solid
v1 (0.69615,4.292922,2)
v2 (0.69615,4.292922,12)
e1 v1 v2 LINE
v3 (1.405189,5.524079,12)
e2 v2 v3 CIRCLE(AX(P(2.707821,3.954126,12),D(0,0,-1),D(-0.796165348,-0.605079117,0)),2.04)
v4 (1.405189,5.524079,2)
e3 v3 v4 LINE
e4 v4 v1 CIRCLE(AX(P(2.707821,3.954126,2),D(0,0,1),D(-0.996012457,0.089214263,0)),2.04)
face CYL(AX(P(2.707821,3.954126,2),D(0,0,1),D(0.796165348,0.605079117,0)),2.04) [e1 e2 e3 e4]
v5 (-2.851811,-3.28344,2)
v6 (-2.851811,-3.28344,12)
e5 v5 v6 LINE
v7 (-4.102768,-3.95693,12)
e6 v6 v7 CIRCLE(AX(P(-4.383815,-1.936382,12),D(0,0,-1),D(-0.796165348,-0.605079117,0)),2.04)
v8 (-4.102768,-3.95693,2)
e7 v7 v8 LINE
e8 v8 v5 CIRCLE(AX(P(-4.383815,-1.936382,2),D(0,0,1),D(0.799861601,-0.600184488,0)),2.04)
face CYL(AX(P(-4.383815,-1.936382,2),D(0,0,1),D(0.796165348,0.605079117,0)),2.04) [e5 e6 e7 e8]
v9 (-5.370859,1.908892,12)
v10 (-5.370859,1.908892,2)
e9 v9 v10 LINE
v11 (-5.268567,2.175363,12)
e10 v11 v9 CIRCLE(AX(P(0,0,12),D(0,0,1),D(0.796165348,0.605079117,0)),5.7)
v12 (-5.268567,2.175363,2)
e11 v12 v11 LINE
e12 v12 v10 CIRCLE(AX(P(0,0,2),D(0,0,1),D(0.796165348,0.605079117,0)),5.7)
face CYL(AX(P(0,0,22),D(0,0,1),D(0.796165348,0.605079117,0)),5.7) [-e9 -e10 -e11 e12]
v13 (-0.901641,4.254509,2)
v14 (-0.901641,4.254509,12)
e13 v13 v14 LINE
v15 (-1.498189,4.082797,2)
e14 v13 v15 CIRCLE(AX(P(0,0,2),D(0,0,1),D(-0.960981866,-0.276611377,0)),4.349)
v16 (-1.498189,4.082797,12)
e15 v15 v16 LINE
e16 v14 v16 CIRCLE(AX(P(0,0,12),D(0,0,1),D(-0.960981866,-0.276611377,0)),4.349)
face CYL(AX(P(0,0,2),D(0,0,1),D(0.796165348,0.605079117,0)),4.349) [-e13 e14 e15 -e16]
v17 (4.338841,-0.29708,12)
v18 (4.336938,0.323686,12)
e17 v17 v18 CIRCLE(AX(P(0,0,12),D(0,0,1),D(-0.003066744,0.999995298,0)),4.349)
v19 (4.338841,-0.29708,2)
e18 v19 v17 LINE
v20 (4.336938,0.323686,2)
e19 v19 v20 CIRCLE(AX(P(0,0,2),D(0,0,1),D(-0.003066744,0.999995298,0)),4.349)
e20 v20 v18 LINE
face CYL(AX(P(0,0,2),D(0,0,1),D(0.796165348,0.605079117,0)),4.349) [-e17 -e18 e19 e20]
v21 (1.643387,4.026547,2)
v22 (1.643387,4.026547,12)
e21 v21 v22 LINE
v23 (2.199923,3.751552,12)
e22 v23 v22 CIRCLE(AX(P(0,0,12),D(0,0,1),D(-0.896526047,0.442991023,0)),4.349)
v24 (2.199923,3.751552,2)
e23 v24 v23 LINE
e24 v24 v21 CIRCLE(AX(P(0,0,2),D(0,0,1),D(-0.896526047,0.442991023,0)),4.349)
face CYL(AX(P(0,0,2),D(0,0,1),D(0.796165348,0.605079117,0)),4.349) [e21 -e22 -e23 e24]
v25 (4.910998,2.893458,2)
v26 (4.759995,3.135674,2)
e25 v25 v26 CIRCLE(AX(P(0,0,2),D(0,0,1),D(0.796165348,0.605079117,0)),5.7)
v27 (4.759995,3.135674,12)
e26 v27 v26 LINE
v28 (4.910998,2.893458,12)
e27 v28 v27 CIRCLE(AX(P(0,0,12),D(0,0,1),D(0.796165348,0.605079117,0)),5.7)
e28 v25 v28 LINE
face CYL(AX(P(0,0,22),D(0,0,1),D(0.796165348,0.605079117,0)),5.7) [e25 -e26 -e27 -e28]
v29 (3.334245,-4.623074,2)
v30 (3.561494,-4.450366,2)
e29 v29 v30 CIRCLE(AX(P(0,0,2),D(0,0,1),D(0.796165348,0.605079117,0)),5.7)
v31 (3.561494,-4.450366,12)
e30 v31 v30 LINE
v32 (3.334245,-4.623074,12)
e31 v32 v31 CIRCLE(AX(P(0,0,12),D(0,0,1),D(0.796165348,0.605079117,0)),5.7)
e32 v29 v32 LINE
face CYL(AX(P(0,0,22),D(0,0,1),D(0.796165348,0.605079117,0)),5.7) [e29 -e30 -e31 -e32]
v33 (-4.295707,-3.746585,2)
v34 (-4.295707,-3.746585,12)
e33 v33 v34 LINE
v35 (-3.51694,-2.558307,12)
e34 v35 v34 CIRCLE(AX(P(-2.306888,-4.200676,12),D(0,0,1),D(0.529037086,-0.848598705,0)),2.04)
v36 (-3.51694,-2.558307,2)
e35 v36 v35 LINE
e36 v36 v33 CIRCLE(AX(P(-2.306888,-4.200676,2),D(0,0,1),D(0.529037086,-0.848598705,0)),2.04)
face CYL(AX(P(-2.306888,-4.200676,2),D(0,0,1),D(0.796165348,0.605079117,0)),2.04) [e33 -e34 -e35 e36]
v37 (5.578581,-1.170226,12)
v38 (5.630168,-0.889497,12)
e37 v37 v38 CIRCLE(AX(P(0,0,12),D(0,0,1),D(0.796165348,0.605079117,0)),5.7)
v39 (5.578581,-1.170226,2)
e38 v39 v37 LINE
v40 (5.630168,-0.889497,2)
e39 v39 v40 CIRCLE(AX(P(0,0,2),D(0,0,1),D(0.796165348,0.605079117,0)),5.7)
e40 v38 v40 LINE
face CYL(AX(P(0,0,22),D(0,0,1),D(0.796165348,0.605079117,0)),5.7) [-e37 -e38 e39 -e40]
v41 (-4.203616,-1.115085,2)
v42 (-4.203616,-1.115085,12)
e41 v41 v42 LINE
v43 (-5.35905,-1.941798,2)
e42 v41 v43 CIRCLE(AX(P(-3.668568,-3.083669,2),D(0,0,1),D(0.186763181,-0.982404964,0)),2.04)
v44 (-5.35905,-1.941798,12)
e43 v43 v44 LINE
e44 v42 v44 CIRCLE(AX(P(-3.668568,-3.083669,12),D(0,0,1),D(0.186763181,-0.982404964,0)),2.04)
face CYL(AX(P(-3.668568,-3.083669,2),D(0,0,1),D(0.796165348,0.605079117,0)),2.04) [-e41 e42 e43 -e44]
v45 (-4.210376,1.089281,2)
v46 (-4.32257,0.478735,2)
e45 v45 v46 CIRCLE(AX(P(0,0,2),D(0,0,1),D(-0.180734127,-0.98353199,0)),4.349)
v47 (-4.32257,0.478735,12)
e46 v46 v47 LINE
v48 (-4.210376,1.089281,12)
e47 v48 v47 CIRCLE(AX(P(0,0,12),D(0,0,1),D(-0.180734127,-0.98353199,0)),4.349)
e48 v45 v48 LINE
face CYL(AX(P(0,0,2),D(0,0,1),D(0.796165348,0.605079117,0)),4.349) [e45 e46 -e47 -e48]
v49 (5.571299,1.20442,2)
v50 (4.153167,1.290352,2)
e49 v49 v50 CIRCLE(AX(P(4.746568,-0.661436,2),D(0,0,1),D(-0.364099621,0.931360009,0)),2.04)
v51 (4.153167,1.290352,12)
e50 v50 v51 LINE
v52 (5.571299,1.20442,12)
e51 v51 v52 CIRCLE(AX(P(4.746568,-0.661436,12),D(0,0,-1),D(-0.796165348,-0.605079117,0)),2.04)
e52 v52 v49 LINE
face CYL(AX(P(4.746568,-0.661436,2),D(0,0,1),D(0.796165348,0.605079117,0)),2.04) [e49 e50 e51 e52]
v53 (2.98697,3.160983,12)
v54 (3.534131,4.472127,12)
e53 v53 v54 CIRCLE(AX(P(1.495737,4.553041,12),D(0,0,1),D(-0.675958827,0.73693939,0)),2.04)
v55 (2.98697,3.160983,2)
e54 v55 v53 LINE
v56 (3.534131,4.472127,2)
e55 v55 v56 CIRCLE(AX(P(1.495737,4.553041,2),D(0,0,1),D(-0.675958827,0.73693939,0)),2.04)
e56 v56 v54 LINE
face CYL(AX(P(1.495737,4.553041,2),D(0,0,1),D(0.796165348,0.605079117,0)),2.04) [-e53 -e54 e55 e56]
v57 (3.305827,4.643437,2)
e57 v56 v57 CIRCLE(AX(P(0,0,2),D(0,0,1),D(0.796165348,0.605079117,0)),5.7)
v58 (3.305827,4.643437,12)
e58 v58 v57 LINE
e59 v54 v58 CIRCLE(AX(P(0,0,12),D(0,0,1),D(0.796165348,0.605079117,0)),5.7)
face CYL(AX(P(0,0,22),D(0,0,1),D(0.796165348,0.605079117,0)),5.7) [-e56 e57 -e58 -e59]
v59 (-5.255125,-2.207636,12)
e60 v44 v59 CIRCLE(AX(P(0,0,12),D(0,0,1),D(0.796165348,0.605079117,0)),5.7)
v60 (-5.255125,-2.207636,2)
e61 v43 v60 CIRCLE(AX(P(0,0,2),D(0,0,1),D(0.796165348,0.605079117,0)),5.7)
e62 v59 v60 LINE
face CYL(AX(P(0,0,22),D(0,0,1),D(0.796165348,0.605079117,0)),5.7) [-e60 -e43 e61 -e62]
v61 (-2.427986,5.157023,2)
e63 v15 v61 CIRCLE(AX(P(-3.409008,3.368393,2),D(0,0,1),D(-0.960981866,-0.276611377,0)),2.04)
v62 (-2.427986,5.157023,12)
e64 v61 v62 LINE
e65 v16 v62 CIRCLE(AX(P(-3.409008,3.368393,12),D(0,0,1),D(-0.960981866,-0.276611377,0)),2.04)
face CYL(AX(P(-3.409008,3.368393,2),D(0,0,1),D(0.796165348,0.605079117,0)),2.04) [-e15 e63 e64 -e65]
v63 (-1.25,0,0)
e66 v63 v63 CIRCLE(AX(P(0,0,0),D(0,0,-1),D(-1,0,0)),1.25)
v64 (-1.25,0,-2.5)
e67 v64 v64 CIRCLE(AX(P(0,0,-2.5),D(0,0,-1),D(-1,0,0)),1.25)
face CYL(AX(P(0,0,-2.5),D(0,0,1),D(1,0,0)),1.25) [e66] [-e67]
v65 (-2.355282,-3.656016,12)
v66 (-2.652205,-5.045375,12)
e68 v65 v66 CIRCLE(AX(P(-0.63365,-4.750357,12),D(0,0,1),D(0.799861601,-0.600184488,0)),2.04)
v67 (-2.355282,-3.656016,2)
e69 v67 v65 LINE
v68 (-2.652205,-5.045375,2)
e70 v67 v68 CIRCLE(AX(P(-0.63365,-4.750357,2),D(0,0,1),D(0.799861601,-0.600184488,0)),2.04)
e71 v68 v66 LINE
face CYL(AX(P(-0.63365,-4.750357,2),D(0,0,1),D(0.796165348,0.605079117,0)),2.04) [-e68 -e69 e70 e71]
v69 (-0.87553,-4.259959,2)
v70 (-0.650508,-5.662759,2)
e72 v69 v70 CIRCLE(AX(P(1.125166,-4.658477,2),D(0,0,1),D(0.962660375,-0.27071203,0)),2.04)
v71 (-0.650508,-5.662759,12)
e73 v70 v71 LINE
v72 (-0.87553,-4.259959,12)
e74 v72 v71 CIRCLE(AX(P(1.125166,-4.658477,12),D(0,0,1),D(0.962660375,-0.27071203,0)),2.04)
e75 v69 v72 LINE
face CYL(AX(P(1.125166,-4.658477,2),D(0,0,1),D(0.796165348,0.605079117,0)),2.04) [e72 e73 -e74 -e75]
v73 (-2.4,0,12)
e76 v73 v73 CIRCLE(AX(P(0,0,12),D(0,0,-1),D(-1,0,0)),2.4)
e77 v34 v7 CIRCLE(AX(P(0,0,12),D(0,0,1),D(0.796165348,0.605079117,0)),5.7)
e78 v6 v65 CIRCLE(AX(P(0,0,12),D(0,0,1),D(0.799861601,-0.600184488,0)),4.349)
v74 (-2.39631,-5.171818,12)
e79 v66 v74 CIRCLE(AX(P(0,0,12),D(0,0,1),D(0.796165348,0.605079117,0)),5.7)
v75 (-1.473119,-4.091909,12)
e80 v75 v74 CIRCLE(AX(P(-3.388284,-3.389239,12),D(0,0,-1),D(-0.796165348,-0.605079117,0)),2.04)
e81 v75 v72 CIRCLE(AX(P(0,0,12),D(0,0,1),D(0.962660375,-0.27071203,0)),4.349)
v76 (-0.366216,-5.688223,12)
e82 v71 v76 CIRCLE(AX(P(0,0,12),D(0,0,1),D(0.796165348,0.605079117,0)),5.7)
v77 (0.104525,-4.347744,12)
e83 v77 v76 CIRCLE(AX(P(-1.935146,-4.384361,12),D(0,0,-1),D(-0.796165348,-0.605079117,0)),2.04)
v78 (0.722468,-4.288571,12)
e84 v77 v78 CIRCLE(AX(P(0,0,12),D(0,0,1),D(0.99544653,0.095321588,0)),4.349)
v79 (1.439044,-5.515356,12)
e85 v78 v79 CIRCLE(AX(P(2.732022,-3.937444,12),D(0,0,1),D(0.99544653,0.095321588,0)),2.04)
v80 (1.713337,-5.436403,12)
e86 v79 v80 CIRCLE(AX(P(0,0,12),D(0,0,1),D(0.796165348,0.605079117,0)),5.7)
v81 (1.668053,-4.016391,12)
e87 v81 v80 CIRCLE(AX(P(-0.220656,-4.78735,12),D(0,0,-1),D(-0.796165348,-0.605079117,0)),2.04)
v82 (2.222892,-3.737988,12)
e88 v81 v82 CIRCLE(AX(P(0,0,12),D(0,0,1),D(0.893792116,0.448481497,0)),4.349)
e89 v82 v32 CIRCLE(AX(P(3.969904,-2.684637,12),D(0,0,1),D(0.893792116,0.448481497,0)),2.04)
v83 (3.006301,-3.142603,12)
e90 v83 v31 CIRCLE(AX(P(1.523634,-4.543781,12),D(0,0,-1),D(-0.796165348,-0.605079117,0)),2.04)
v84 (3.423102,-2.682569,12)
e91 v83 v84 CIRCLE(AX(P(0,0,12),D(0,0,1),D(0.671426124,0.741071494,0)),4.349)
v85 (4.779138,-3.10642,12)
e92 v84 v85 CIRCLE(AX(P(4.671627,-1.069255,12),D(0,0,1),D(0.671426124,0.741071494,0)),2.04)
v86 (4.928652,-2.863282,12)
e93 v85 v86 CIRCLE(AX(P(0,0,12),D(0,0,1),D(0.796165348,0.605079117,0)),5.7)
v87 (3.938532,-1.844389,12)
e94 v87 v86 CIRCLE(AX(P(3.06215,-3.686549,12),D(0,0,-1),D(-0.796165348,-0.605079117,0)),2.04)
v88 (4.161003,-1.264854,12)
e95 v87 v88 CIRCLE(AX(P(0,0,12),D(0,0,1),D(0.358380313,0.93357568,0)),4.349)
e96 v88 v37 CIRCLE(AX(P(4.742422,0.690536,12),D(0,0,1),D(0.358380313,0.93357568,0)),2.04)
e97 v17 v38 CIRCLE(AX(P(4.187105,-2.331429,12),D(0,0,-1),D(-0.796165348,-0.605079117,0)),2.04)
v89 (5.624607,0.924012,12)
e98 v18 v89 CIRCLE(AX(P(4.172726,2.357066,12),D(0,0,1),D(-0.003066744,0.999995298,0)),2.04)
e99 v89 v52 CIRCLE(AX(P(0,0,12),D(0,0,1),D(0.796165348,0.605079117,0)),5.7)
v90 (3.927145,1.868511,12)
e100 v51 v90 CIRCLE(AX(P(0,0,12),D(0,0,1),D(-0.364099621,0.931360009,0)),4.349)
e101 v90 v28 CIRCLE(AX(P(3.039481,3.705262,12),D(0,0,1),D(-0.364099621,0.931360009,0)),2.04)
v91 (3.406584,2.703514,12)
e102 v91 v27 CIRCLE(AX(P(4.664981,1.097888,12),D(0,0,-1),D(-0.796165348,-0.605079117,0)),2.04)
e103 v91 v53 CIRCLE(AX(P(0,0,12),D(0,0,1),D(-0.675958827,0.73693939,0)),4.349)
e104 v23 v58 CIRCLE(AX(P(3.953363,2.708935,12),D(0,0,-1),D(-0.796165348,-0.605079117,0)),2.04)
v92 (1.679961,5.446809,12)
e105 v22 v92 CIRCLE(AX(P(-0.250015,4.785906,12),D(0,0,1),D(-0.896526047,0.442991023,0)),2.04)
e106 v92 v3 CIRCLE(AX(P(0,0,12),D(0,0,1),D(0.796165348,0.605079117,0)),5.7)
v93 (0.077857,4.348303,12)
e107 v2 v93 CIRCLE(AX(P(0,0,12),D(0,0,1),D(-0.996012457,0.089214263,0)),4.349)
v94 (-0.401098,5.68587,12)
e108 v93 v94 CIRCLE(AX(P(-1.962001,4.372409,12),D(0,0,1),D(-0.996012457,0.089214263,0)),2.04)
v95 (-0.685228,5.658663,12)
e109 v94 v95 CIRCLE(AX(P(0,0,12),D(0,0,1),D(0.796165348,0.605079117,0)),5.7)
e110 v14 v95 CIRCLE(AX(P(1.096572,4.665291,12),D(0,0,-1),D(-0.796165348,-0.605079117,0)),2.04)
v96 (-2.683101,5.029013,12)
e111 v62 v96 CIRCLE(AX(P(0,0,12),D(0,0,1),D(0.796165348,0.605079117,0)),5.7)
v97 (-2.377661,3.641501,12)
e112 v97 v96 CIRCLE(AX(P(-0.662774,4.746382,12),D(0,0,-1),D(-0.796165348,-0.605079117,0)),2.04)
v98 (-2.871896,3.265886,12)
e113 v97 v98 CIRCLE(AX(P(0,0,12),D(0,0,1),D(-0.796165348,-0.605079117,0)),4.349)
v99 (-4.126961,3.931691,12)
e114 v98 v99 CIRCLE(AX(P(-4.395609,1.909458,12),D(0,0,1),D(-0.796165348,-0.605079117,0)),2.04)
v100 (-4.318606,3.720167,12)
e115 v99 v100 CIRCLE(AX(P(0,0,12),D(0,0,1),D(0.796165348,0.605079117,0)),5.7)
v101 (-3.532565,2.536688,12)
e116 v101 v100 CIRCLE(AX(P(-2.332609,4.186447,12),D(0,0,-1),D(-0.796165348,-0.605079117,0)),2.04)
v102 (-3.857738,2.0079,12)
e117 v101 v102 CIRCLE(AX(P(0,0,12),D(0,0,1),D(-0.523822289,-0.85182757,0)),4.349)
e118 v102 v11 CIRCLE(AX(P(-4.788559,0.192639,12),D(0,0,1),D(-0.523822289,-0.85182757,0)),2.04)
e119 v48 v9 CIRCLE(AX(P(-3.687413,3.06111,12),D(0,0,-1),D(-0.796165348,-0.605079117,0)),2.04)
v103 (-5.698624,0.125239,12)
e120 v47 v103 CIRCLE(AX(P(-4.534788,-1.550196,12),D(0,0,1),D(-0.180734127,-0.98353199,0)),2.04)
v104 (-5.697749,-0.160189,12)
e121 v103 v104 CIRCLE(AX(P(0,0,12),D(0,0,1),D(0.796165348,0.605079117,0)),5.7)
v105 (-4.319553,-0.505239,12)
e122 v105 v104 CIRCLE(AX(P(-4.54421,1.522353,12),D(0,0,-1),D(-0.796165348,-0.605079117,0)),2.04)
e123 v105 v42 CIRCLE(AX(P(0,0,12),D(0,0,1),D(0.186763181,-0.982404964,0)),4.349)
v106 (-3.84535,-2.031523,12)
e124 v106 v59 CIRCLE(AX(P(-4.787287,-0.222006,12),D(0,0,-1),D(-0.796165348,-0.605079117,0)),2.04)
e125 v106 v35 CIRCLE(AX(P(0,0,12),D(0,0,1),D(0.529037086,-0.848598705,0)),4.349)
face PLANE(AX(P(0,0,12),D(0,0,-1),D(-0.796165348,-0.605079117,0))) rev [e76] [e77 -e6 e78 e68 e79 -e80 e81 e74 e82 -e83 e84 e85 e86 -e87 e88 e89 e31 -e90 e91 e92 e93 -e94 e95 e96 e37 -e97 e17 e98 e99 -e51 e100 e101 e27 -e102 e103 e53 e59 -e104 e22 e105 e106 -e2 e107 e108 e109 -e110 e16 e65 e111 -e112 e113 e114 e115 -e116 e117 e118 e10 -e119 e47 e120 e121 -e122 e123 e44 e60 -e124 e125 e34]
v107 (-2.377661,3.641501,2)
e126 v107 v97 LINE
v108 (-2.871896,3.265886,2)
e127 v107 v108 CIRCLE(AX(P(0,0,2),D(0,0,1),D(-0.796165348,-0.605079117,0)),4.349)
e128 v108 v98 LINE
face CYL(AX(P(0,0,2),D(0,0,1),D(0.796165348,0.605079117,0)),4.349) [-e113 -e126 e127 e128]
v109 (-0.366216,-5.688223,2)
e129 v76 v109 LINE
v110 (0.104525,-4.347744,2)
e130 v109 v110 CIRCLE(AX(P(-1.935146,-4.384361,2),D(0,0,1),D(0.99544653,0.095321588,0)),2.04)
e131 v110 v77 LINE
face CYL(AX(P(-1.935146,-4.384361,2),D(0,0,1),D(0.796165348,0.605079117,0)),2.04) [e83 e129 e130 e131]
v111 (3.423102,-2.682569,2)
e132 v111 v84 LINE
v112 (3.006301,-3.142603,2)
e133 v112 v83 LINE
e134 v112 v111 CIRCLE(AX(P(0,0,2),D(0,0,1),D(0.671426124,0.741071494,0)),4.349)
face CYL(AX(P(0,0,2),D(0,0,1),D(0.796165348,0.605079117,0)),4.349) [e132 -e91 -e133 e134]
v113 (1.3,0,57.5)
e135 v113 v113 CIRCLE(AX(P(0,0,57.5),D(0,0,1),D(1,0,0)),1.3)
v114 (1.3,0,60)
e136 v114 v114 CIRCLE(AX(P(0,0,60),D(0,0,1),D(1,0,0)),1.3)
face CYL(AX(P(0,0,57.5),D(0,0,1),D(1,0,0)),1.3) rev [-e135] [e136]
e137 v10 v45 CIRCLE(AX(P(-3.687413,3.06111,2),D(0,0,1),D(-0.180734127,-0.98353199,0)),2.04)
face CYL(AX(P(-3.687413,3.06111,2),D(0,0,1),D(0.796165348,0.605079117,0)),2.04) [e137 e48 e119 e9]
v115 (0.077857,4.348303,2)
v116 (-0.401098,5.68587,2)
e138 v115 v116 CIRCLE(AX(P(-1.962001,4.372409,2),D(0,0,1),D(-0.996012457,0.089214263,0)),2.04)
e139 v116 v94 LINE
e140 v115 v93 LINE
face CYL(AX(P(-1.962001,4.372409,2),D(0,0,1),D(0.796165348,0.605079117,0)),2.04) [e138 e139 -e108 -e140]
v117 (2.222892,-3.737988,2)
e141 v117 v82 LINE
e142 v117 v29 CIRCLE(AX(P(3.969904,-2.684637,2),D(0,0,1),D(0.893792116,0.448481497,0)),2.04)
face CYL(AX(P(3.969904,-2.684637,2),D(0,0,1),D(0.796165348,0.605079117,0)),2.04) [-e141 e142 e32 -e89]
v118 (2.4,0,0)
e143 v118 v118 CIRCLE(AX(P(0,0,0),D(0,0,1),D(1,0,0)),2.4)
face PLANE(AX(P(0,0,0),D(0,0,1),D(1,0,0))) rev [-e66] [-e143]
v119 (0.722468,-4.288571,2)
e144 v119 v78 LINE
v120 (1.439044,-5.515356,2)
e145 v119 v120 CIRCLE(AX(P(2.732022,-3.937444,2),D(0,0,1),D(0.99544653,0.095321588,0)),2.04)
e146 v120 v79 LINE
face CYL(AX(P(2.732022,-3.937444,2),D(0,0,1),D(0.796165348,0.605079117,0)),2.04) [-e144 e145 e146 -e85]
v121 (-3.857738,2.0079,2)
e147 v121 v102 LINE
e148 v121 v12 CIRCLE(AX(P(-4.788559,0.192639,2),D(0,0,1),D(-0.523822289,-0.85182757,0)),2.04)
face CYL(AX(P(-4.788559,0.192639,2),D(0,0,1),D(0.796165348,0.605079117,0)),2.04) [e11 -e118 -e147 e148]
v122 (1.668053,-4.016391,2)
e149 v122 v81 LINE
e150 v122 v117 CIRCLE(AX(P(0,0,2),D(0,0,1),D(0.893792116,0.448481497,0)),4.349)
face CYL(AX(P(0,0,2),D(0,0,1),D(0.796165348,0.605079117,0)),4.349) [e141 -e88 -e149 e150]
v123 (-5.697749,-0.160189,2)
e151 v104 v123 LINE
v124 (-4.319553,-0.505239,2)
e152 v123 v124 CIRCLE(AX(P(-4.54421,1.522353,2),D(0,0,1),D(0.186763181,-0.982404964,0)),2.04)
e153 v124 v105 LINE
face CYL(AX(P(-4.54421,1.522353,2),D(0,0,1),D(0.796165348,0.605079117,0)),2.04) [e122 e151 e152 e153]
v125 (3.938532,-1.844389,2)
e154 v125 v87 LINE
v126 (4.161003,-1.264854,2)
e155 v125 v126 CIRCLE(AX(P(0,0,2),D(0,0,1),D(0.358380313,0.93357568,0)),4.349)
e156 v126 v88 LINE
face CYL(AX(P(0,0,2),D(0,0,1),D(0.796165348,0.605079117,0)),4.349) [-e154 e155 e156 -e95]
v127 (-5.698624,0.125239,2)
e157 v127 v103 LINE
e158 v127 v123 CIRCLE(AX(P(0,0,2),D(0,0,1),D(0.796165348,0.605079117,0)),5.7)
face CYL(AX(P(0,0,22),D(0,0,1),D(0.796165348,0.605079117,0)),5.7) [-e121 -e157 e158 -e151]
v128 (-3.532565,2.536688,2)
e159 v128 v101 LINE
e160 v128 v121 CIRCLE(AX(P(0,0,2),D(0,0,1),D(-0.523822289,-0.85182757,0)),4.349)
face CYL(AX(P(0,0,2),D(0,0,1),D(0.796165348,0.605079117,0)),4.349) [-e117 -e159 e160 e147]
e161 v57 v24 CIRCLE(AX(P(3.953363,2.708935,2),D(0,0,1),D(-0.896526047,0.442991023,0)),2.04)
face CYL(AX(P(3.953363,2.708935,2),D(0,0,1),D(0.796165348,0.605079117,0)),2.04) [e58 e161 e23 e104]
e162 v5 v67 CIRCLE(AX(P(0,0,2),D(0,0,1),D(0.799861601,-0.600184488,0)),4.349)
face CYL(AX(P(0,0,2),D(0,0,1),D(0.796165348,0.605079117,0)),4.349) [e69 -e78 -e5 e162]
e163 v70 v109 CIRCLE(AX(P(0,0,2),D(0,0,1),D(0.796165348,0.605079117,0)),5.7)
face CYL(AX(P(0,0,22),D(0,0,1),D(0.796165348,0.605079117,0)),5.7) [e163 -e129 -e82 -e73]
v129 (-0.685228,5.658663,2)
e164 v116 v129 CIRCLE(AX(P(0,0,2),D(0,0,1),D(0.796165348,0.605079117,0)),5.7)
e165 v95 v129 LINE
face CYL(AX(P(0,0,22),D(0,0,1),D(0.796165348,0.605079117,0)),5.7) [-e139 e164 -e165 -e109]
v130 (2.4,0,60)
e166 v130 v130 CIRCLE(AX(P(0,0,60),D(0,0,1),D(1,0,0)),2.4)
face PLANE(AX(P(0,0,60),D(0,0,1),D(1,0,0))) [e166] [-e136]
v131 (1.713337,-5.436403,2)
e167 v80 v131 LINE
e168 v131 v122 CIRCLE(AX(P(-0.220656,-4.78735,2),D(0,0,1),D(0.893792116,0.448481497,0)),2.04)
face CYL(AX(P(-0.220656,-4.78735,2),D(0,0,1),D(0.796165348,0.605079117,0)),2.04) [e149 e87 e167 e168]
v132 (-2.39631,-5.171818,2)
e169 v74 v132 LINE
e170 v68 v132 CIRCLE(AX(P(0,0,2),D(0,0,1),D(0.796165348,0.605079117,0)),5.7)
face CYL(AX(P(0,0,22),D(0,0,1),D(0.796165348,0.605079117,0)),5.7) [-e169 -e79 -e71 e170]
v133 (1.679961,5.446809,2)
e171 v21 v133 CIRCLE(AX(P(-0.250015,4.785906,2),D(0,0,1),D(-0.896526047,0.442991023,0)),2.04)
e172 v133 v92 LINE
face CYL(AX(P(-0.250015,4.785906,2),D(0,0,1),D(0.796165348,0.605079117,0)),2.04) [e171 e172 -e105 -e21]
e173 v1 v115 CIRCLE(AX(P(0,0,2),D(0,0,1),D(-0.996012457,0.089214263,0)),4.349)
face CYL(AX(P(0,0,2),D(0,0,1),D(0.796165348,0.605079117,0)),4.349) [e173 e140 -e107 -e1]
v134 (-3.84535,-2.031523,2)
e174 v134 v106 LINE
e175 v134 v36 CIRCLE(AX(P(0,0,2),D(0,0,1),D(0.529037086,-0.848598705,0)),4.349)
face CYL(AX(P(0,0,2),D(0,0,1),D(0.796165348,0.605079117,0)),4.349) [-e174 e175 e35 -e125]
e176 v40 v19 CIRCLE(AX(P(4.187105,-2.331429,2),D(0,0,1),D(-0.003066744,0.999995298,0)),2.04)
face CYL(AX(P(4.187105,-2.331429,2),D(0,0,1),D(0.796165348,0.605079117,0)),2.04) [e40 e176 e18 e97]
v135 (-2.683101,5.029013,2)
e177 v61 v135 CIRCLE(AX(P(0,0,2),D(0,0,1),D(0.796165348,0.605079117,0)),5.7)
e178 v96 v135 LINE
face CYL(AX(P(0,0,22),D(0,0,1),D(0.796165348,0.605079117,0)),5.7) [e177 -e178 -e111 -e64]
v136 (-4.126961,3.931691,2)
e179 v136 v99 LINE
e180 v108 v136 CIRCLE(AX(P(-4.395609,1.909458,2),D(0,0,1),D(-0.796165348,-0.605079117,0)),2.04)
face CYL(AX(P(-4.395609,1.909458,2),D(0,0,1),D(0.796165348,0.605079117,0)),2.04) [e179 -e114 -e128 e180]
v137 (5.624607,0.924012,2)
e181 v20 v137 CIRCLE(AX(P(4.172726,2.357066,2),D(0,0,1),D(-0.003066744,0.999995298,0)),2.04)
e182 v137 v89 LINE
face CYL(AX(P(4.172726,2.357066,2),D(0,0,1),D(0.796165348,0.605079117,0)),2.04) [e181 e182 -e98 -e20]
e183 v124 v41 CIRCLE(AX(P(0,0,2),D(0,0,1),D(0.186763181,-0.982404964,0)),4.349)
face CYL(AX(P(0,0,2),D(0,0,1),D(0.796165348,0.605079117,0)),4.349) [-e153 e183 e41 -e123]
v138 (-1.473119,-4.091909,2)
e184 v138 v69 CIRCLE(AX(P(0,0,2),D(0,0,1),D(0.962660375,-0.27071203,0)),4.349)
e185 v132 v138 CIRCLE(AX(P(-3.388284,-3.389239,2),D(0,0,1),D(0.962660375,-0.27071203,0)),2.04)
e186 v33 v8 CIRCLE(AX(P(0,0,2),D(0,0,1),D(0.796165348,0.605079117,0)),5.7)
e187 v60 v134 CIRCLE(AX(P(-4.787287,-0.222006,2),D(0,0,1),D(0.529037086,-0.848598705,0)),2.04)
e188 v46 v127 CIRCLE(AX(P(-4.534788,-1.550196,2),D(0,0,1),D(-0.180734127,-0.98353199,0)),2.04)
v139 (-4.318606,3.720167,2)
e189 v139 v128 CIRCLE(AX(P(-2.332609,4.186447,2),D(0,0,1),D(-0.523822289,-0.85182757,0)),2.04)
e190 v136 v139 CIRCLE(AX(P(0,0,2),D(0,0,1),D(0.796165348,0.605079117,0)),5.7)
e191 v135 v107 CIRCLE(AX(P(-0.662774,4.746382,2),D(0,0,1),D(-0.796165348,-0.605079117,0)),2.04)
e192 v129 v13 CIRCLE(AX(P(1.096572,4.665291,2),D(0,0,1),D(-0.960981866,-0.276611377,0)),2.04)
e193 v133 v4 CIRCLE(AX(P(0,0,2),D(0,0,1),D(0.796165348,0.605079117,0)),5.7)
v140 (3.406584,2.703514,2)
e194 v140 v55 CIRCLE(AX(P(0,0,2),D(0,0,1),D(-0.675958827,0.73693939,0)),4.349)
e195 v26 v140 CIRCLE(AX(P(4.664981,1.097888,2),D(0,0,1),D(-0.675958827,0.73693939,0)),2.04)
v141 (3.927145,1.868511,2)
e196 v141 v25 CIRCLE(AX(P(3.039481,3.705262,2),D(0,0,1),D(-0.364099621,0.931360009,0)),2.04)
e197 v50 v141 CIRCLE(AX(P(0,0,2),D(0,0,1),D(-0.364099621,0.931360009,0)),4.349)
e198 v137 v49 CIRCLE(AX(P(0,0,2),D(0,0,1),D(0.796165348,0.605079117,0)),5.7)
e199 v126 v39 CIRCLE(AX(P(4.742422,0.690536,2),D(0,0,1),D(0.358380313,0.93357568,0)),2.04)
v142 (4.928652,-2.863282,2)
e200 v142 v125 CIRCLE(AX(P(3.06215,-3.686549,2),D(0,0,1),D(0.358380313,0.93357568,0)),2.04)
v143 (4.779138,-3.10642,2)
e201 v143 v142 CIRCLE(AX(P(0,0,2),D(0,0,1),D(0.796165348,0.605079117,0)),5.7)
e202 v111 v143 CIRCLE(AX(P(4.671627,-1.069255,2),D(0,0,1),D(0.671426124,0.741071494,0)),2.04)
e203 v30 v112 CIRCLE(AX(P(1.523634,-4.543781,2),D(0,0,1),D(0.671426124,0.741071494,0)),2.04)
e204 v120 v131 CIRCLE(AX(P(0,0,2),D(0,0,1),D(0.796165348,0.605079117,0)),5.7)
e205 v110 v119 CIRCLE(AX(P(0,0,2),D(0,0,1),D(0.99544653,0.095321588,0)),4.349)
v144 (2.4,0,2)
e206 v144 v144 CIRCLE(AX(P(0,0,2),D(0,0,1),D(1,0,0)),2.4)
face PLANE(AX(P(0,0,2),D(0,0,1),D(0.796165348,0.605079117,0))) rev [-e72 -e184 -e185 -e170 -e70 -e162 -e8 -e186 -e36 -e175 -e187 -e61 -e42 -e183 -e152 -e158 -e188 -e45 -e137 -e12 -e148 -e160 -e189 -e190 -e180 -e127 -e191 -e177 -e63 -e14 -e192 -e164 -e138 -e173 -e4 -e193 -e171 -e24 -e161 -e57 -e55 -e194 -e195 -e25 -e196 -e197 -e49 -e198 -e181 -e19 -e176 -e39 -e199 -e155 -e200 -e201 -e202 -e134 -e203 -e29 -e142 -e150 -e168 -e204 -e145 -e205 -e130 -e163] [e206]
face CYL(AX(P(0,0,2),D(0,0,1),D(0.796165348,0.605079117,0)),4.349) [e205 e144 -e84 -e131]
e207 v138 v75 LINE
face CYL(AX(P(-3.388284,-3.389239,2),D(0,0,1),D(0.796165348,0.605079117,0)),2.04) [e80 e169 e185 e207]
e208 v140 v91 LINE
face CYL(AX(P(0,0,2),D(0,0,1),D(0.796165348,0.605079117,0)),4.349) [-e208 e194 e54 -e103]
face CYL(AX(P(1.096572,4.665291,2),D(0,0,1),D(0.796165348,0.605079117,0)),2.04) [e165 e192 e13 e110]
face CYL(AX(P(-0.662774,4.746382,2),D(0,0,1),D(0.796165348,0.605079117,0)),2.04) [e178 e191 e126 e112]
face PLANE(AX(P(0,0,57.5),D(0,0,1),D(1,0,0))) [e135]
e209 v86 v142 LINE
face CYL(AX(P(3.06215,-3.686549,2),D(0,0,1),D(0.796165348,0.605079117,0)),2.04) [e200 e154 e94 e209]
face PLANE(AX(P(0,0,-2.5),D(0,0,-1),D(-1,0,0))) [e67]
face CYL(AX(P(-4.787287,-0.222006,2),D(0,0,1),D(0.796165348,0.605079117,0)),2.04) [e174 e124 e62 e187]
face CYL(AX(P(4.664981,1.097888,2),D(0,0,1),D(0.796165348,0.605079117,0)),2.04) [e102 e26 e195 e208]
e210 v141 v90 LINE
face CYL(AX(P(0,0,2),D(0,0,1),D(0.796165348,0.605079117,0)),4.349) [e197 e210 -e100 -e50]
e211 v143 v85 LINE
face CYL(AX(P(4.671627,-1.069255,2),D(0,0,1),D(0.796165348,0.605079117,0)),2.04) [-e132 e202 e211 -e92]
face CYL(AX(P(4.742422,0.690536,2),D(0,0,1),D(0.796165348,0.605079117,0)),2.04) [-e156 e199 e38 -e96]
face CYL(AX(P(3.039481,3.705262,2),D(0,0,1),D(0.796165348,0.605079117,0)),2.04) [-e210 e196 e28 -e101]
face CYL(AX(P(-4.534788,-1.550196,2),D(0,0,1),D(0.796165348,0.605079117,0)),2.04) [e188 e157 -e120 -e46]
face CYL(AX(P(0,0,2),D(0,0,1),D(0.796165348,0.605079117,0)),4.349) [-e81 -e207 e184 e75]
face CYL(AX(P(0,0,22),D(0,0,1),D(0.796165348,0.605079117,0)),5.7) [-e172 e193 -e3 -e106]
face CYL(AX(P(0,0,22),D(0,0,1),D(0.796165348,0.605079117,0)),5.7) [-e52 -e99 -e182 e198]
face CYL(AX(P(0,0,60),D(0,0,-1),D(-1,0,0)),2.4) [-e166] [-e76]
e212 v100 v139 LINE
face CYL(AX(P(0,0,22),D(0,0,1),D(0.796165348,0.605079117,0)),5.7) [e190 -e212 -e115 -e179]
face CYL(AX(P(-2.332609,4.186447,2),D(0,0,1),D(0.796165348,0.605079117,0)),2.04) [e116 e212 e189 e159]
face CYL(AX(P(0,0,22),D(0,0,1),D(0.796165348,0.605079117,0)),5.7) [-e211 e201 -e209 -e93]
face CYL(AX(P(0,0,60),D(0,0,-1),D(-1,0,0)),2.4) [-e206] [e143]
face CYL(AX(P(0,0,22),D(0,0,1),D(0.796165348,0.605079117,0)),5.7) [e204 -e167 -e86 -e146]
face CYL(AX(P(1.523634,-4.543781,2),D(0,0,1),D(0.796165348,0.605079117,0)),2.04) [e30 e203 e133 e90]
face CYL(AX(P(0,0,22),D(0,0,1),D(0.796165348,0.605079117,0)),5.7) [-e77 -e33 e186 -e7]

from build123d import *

# Parameters (mm, degrees)
SKETCH1_R           = 2.4
BOSS_EXTRUDE1_DEPTH = 60
SKETCH6_R           = 1.25
BOSS_EXTRUDE2_DEPTH = 2.5
SKETCH7_R           = 1.3
CUT_EXTRUDE1_DEPTH  = 2.5
JOIN2_START         = 2
JOIN2_OUTLINE_R     = 2.4
JOIN2_DEPTH         = 10


# Read off the part's stored shape, not the designer's step: Join2
with BuildPart() as part:
    # Sketch1 → Boss-Extrude1 (new body)
    with BuildSketch(Plane.XY):
        Circle(SKETCH1_R)
    extrude(amount=BOSS_EXTRUDE1_DEPTH)

    # Sketch6 → Boss-Extrude2 (add)
    with BuildSketch(Plane(origin=(0, 0, 0), x_dir=(-1, 0, 0), z_dir=(0, 0, -1))):
        Circle(SKETCH6_R)
    extrude(amount=BOSS_EXTRUDE2_DEPTH)

    # Sketch7 → Cut-Extrude1 (cut)
    with BuildSketch(Plane.XY.offset(60)):
        Circle(SKETCH7_R)
    extrude(amount=-CUT_EXTRUDE1_DEPTH, mode=Mode.SUBTRACT)

    # Join2 outline → Join2 (add)
    with BuildSketch(Plane.XY.offset(JOIN2_START)):
        with BuildLine():
            ThreePointArc((2.986969532, 3.160983077), (3.378378938, 3.767383023), (3.534131338, 4.472126528))
            ThreePointArc((3.534131338, 4.472126528), (3.42105158, 4.559211126), (3.305826871, 4.643437164))
            ThreePointArc((3.305826871, 4.643437164), (2.672723858, 4.296878666), (2.199922956, 3.751551677))
            ThreePointArc((2.199922956, 3.751551677), (1.926567958, 3.89899178), (1.643387346, 4.026546788))
            ThreePointArc((1.643387346, 4.026546788), (1.78930882, 4.733391284), (1.679960889, 5.446809287))
            ThreePointArc((1.679960889, 5.446809287), (1.54305857, 5.487164136), (1.405188775, 5.524078612))
            ThreePointArc((1.405188775, 5.524078612), (0.940029166, 4.972219249), (0.696150284, 4.29292159))
            ThreePointArc((0.696150284, 4.29292159), (0.387992831, 4.331658177), (0.077856591, 4.348303043))
            ThreePointArc((0.077856591, 4.348303043), (-0.04141737, 5.060128822), (-0.401097586, 5.68587027))
            ThreePointArc((-0.401097586, 5.68587027), (-0.54333305, 5.674045223), (-0.685227852, 5.658662633))
            ThreePointArc((-0.685227852, 5.658662633), (-0.919621674, 4.976034071), (-0.90164134, 4.254508655))
            ThreePointArc((-0.90164134, 4.254508655), (-1.202982876, 4.179310134), (-1.498189127, 4.082796877))
            ThreePointArc((-1.498189127, 4.082796877), (-1.866549914, 4.703467924), (-2.427985611, 5.157022966))
            ThreePointArc((-2.427985611, 5.157022966), (-2.556344531, 5.094615063), (-2.683100661, 5.02901291))
            ThreePointArc((-2.683100661, 5.02901291), (-2.655072511, 4.307807918), (-2.377661306, 3.64150075))
            ThreePointArc((-2.377661306, 3.64150075), (-2.631489081, 3.4625231), (-2.871896102, 3.26588637))
            ThreePointArc((-2.871896102, 3.26588637), (-3.439594549, 3.71157762), (-4.126960724, 3.931691135))
            ThreePointArc((-4.126960724, 3.931691135), (-4.224107518, 3.827128908), (-4.318605858, 3.720167126))
            ThreePointArc((-4.318605858, 3.720167126), (-4.031941094, 3.057788434), (-3.532564937, 2.536687991))
            ThreePointArc((-3.532564937, 2.536687991), (-3.704598104, 2.278103134), (-3.857737594, 2.007899811))
            ThreePointArc((-3.857737594, 2.007899811), (-4.548102881, 2.218418192), (-5.268566924, 2.17536263))
            ThreePointArc((-5.268566924, 2.17536263), (-5.321381378, 2.042767787), (-5.370859403, 1.908892158))
            ThreePointArc((-5.370859403, 1.908892158), (-4.864273689, 1.39479768), (-4.210376099, 1.089281462))
            ThreePointArc((-4.210376099, 1.089281462), (-4.277380625, 0.786012716), (-4.322570249, 0.478735257))
            ThreePointArc((-4.322570249, 0.478735257), (-5.042364718, 0.425649095), (-5.698623966, 0.125239347))
            ThreePointArc((-5.698623966, 0.125239347), (-5.699973196, -0.017480443), (-5.697748625, -0.160189273))
            ThreePointArc((-5.697748625, -0.160189273), (-5.039659169, -0.45656823), (-4.319552638, -0.505238564))
            ThreePointArc((-4.319552638, -0.505238564), (-4.272479191, -0.812233074), (-4.203615838, -1.115085146))
            ThreePointArc((-4.203615838, -1.115085146), (-4.855627257, -1.424606272), (-5.359050265, -1.941798203))
            ThreePointArc((-5.359050265, -1.941798203), (-5.308752049, -2.075367842), (-5.255125323, -2.207636255))
            ThreePointArc((-5.255125323, -2.207636255), (-4.534410753, -2.246272071), (-3.845349658, -2.031523322))
            ThreePointArc((-3.845349658, -2.031523322), (-3.690555767, -2.300782287), (-3.516939816, -2.558307122))
            ThreePointArc((-3.516939816, -2.558307122), (-4.013110431, -3.082460667), (-4.295707129, -3.746585146))
            ThreePointArc((-4.295707129, -3.746585146), (-4.200554521, -3.852965314), (-4.102768227, -3.956929729))
            ThreePointArc((-4.102768227, -3.956929729), (-3.416765039, -3.732604421), (-2.851810899, -3.283439599))
            ThreePointArc((-2.851810899, -3.283439599), (-2.610202337, -3.478598103), (-2.355281584, -3.656015544))
            ThreePointArc((-2.355281584, -3.656015544), (-2.628600803, -4.324011669), (-2.652204943, -5.045375005))
            ThreePointArc((-2.652204943, -5.045375005), (-2.52504883, -5.110198471), (-2.396309547, -5.171817916))
            ThreePointArc((-2.396309547, -5.171817916), (-1.837666272, -4.714827862), (-1.473119275, -4.091909163))
            ThreePointArc((-1.473119275, -4.091909163), (-1.177326617, -4.186609969), (-0.875529522, -4.259958809))
            ThreePointArc((-0.875529522, -4.259958809), (-0.889084071, -4.981580935), (-0.650507783, -5.662759012))
            ThreePointArc((-0.650507783, -5.662759012), (-0.508521301, -5.677271007), (-0.366215984, -5.688223436))
            ThreePointArc((-0.366215984, -5.688223436), (-0.010380493, -5.060287674), (0.104525269, -4.347743722))
            ThreePointArc((0.104525269, -4.347743722), (0.414553585, -4.329196961), (0.722467652, -4.288571031))
            ThreePointArc((0.722467652, -4.288571031), (0.970508391, -4.966360091), (1.439044058, -5.515356036))
            ThreePointArc((1.439044058, -5.515356036), (1.576684846, -5.477596635), (1.713337076, -5.436402861))
            ThreePointArc((1.713337076, -5.436402861), (1.818307229, -4.722327595), (1.668053097, -4.016391398))
            ThreePointArc((1.668053097, -4.016391398), (1.950446029, -3.887101914), (2.222891567, -3.737987972))
            ThreePointArc((2.222891567, -3.737987972), (2.699028318, -4.280404798), (3.334245025, -4.623073665))
            ThreePointArc((3.334245025, -4.623073665), (3.448950969, -4.538142485), (3.56149447, -4.450365955))
            ThreePointArc((3.56149447, -4.450365955), (3.401422484, -3.746591007), (3.006301111, -3.142603161))
            ThreePointArc((3.006301111, -3.142603161), (3.222919929, -2.920032214), (3.423101659, -2.682568924))
            ThreePointArc((3.423101659, -2.682568924), (4.063029514, -3.016357118), (4.779137726, -3.106419579))
            ThreePointArc((4.779137726, -3.106419579), (4.855417152, -2.985787046), (4.928652302, -2.863282467))
            ThreePointArc((4.928652302, -2.863282467), (4.525156785, -2.264856544), (3.938531501, -1.844388954))
            ThreePointArc((3.938531501, -1.844388954), (4.060120634, -1.558595984), (4.161002903, -1.264854079))
            ThreePointArc((4.161002903, -1.264854079), (4.87829606, -1.344933695), (5.578581394, -1.170226315))
            ThreePointArc((5.578581394, -1.170226315), (5.606132343, -1.030184521), (5.630168329, -0.889496816))
            ThreePointArc((5.630168329, -0.889496816), (5.037743587, -0.477240654), (4.338841388, -0.297079798))
            ThreePointArc((4.338841388, -0.297079798), (4.348979549, 0.013337271), (4.336937648, 0.323686319))
            ThreePointArc((4.336937648, 0.323686319), (5.034721691, 0.508130476), (5.624606733, 0.924012497))
            ThreePointArc((5.624606733, 0.924012497), (5.599708298, 1.064550132), (5.571298926, 1.204420309))
            ThreePointArc((5.571298926, 1.204420309), (4.869955203, 1.374829231), (4.153166704, 1.290351631))
            ThreePointArc((4.153166704, 1.290351631), (4.050484678, 1.583469253), (3.927144933, 1.868511086))
            ThreePointArc((3.927144933, 1.868511086), (4.511180261, 2.29256881), (4.910997766, 2.893458301))
            ThreePointArc((4.910997766, 2.893458301), (4.837012617, 3.01551139), (4.759994731, 3.135673797))
            ThreePointArc((4.759994731, 3.135673797), (4.044452383, 3.04122081), (3.406583842, 2.703513922))
            ThreePointArc((3.406583842, 2.703513922), (3.204949406, 2.939744939), (2.986969532, 3.160983077))
        make_face()
        Circle(JOIN2_OUTLINE_R, mode=Mode.SUBTRACT)
    extrude(amount=JOIN2_DEPTH)


solid = part.part
